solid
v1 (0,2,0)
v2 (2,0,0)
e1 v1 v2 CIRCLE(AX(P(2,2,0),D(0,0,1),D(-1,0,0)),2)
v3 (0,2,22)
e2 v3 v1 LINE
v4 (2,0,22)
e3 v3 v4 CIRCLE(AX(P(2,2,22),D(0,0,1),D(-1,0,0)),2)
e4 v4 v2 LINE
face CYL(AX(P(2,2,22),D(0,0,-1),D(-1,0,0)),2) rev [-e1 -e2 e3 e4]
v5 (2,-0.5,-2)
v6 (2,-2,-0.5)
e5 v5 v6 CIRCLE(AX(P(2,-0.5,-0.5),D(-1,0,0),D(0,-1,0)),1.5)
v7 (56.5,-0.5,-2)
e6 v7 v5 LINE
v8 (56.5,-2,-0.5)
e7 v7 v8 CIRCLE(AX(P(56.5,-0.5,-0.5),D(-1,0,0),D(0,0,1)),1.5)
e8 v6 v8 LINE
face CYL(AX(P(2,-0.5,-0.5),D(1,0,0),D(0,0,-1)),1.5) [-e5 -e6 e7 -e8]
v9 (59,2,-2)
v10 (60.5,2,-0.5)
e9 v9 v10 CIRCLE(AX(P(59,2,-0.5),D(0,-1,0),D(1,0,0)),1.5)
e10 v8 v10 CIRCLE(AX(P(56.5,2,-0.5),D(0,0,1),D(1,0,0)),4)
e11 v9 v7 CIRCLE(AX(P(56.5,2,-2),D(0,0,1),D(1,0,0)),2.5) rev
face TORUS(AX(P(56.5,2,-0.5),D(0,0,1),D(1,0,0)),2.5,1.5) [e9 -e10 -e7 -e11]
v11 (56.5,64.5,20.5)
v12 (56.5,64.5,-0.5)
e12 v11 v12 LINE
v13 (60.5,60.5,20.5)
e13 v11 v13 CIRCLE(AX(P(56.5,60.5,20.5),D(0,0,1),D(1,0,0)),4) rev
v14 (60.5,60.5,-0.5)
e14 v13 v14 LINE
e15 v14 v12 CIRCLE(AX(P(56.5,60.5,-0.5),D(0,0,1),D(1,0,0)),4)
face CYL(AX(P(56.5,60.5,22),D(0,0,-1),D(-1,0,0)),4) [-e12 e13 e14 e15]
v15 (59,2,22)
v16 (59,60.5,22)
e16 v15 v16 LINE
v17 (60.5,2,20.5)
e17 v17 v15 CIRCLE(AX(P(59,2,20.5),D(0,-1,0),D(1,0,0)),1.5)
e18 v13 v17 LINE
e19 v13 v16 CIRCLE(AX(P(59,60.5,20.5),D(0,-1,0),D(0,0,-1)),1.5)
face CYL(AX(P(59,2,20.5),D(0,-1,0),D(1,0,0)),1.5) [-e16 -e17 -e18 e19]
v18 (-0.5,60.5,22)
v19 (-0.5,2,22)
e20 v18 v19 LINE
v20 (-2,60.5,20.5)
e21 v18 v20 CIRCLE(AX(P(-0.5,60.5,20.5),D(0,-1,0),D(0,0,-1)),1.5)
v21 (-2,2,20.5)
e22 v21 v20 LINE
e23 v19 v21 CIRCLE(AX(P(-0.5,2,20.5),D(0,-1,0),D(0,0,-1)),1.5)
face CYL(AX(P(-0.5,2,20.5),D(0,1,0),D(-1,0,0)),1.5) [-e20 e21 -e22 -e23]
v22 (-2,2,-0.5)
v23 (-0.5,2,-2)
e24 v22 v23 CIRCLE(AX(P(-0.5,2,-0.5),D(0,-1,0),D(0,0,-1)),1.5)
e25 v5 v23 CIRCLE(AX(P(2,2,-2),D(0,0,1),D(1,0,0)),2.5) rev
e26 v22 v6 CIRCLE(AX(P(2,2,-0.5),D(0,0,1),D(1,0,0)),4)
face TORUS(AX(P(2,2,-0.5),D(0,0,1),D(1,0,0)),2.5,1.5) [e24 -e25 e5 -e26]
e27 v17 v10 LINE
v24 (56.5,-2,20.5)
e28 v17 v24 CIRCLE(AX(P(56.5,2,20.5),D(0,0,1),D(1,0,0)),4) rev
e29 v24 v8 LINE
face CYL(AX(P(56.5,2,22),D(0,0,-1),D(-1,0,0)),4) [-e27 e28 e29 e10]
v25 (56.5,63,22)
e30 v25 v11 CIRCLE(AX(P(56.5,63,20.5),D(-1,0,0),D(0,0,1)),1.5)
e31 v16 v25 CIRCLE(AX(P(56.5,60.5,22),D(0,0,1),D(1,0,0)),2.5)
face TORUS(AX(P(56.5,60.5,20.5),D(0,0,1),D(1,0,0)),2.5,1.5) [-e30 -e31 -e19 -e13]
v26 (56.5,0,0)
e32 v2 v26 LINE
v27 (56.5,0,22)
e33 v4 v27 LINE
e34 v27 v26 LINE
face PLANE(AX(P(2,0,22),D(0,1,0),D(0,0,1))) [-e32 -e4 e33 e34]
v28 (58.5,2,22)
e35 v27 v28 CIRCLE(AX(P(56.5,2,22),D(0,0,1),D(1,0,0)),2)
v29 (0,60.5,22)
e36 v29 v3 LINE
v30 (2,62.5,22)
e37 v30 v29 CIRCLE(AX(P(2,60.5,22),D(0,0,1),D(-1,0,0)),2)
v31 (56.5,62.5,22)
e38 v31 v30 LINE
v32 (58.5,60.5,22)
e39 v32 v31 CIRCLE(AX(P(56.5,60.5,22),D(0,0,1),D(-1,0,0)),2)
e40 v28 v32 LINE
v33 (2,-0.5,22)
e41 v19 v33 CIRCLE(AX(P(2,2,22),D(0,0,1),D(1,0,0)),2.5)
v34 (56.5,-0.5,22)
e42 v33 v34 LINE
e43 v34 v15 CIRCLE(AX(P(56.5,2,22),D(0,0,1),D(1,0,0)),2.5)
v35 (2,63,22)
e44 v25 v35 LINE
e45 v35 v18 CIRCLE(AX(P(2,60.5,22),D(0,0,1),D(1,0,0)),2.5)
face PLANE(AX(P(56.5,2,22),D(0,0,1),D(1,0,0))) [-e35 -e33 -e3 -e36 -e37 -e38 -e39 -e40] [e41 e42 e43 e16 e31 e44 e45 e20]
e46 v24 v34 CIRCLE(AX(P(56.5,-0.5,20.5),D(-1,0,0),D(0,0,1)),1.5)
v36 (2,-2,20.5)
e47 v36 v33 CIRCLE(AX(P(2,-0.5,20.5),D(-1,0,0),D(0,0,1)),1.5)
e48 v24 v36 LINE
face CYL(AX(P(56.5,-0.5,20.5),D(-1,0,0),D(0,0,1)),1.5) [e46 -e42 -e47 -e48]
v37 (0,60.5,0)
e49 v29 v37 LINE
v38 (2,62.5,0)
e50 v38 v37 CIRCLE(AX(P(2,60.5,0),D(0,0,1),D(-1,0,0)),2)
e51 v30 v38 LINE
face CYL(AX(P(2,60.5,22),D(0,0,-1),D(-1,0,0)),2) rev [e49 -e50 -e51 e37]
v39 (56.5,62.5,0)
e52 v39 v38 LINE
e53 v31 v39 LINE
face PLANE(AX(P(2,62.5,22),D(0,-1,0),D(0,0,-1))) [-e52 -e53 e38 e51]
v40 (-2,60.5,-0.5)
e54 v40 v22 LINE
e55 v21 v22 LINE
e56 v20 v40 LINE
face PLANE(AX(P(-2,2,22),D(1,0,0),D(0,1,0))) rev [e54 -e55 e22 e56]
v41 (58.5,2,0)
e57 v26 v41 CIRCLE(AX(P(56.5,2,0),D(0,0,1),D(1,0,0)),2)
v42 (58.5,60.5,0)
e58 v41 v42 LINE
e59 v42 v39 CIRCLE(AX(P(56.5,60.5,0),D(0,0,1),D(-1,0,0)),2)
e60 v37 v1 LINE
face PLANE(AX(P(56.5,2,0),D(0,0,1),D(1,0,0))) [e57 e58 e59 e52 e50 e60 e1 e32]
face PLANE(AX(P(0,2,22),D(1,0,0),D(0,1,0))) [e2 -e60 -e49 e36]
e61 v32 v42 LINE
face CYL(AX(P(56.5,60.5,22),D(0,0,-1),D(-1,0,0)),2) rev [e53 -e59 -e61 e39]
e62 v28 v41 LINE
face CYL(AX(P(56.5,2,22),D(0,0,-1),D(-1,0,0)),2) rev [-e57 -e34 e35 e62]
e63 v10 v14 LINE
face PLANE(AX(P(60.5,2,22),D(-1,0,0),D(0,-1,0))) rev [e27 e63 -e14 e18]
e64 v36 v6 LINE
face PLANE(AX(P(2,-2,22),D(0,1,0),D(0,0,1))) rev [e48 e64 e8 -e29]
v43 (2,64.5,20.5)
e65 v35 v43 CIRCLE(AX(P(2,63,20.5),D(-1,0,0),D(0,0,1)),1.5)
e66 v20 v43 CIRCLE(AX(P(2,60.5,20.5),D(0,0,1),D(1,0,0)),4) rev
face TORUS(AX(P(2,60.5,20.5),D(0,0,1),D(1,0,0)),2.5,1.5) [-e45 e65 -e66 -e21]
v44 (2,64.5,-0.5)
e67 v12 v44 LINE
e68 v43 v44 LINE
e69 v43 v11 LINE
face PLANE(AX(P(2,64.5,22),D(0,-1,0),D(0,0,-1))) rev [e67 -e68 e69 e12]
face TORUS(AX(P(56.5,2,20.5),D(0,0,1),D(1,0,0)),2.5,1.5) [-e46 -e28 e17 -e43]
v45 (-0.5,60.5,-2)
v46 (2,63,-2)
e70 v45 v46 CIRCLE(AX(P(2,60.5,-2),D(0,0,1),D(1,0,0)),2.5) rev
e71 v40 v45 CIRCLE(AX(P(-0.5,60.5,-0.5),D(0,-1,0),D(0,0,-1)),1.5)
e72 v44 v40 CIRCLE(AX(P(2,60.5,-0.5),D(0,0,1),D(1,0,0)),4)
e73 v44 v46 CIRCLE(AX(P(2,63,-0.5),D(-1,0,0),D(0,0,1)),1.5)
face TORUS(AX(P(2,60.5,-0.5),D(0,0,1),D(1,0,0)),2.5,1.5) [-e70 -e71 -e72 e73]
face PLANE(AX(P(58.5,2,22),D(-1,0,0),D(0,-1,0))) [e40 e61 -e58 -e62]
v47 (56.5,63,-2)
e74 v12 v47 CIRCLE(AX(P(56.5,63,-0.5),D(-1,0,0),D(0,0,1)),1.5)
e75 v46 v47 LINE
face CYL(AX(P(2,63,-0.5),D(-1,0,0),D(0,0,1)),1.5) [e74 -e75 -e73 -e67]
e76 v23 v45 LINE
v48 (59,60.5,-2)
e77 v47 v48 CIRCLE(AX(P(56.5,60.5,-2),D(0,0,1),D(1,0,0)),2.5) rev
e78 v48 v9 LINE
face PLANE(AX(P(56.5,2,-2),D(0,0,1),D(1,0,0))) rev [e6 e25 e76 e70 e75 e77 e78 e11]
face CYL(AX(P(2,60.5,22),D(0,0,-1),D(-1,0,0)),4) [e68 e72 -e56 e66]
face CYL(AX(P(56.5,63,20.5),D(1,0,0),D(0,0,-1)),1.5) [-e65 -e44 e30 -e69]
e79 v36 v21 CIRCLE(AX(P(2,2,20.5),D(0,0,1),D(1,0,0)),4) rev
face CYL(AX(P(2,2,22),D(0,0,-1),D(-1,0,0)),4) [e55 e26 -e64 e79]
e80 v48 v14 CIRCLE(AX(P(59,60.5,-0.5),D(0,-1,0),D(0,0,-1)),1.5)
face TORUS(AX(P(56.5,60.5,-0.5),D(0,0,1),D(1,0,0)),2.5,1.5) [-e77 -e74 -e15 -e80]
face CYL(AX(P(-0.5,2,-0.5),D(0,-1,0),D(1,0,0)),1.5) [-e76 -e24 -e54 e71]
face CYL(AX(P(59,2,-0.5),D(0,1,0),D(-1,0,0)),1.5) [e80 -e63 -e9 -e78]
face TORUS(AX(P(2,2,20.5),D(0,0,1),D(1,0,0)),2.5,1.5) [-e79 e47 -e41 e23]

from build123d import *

# Parameters (mm, degrees)
BOSS_EXTRU_1_DEPTH = 22
COQUE1_T           = 2
CONG_1_R           = 1.5
CONG_2_R           = 1.5


with BuildPart() as part:
    # Esquisse1 → Boss.-Extru.1 (new body)
    with BuildSketch(Plane.XY):
        with BuildLine():
            Line((2, 0), (56.5, 0))
            ThreePointArc((56.5, 0), (57.914213562, 0.585786438), (58.5, 2))
            Line((58.5, 2), (58.5, 60.5))
            ThreePointArc((58.5, 60.5), (57.914213562, 61.914213562), (56.5, 62.5))
            Line((56.5, 62.5), (2, 62.5))
            ThreePointArc((2, 62.5), (0.585786438, 61.914213562), (0, 60.5))
            Line((0, 60.5), (0, 2))
            ThreePointArc((0, 2), (0.585786438, 0.585786438), (2, 0))
        make_face()
    extrude(amount=BOSS_EXTRU_1_DEPTH)

    # Coque1
    coque1_openings = [part.faces().sort_by_distance(p)[0] for p in [
        (29.25, 31.25, 22),
    ]]
    offset(amount=COQUE1_T, openings=coque1_openings, kind=Kind.INTERSECTION)

    # Congé1
    # the kernel refuses this fillet: 1.5 mm, written as the material it takes off along each edge
    with BuildSketch(Plane(origin=(56.5, 60.5, 22), x_dir=(0, 1, 0), z_dir=(-1, 0, 0))) as cong_1_piece_1:
        with BuildLine():
            CenterArc((4 - CONG_1_R, CONG_1_R), CONG_1_R, 270, 90)
            Line((4, CONG_1_R), (4, 0))
            Line((4, 0), (4 - CONG_1_R, 0))
        make_face()
    revolve(axis=Axis((56.5, 60.5, 22), (0, 0, -1)), revolution_arc=90, mode=Mode.SUBTRACT)
    with BuildSketch(Plane(origin=(2, 64.5, 22), x_dir=(0, -1, 0), z_dir=(1, 0, 0)), Plane(origin=(56.5, -2, 22), x_dir=(0, 1, 0), z_dir=(-1, 0, 0))) as cong_1_piece_2:
        with BuildLine():
            CenterArc((CONG_1_R, CONG_1_R), CONG_1_R, 180, 90)
            Line((0, CONG_1_R), (0, 0))
            Line((0, 0), (CONG_1_R, 0))
        make_face()
    extrude(amount=54.5, mode=Mode.SUBTRACT)
    with BuildSketch(Plane(origin=(2, 60.5, 22), x_dir=(-1, 0, 0), z_dir=(0, -1, 0))) as cong_1_piece_3:
        with BuildLine():
            CenterArc((4 - CONG_1_R, CONG_1_R), CONG_1_R, 270, 90)
            Line((4, CONG_1_R), (4, 0))
            Line((4, 0), (4 - CONG_1_R, 0))
        make_face()
    revolve(axis=Axis((2, 60.5, 22), (0, 0, -1)), revolution_arc=90, mode=Mode.SUBTRACT)
    with BuildSketch(Plane(origin=(-2, 2, 22), x_dir=(1, 0, 0), z_dir=(0, 1, 0)), Plane(origin=(60.5, 60.5, 22), x_dir=(-1, 0, 0), z_dir=(0, -1, 0))) as cong_1_piece_4:
        with BuildLine():
            CenterArc((CONG_1_R, CONG_1_R), CONG_1_R, 180, 90)
            Line((0, CONG_1_R), (0, 0))
            Line((0, 0), (CONG_1_R, 0))
        make_face()
    extrude(amount=58.5, mode=Mode.SUBTRACT)
    with BuildSketch(Plane(origin=(2, 2, 22), x_dir=(0, -1, 0), z_dir=(1, 0, 0))) as cong_1_piece_5:
        with BuildLine():
            CenterArc((4 - CONG_1_R, CONG_1_R), CONG_1_R, 270, 90)
            Line((4, CONG_1_R), (4, 0))
            Line((4, 0), (4 - CONG_1_R, 0))
        make_face()
    revolve(axis=Axis((2, 2, 22), (0, 0, -1)), revolution_arc=90, mode=Mode.SUBTRACT)
    with BuildSketch(Plane(origin=(56.5, 2, 22), x_dir=(1, 0, 0), z_dir=(0, 1, 0))) as cong_1_piece_6:
        with BuildLine():
            CenterArc((4 - CONG_1_R, CONG_1_R), CONG_1_R, 270, 90)
            Line((4, CONG_1_R), (4, 0))
            Line((4, 0), (4 - CONG_1_R, 0))
        make_face()
    revolve(axis=Axis((56.5, 2, 22), (0, 0, -1)), revolution_arc=90, mode=Mode.SUBTRACT)

    # Congé2
    cong_2_edges = [part.edges().sort_by_distance(p)[0] for p in [
        (29.25, 64.5, -2),
        (59.328427125, 63.328427125, -2),
        (60.5, 31.25, -2),
        (59.328427125, -0.828427125, -2),
        (29.25, -2, -2),
        (-0.828427125, -0.828427125, -2),
        (-2, 31.25, -2),
        (-0.828427125, 63.328427125, -2),
    ]]
    fillet(cong_2_edges, radius=CONG_2_R)


solid = part.part
